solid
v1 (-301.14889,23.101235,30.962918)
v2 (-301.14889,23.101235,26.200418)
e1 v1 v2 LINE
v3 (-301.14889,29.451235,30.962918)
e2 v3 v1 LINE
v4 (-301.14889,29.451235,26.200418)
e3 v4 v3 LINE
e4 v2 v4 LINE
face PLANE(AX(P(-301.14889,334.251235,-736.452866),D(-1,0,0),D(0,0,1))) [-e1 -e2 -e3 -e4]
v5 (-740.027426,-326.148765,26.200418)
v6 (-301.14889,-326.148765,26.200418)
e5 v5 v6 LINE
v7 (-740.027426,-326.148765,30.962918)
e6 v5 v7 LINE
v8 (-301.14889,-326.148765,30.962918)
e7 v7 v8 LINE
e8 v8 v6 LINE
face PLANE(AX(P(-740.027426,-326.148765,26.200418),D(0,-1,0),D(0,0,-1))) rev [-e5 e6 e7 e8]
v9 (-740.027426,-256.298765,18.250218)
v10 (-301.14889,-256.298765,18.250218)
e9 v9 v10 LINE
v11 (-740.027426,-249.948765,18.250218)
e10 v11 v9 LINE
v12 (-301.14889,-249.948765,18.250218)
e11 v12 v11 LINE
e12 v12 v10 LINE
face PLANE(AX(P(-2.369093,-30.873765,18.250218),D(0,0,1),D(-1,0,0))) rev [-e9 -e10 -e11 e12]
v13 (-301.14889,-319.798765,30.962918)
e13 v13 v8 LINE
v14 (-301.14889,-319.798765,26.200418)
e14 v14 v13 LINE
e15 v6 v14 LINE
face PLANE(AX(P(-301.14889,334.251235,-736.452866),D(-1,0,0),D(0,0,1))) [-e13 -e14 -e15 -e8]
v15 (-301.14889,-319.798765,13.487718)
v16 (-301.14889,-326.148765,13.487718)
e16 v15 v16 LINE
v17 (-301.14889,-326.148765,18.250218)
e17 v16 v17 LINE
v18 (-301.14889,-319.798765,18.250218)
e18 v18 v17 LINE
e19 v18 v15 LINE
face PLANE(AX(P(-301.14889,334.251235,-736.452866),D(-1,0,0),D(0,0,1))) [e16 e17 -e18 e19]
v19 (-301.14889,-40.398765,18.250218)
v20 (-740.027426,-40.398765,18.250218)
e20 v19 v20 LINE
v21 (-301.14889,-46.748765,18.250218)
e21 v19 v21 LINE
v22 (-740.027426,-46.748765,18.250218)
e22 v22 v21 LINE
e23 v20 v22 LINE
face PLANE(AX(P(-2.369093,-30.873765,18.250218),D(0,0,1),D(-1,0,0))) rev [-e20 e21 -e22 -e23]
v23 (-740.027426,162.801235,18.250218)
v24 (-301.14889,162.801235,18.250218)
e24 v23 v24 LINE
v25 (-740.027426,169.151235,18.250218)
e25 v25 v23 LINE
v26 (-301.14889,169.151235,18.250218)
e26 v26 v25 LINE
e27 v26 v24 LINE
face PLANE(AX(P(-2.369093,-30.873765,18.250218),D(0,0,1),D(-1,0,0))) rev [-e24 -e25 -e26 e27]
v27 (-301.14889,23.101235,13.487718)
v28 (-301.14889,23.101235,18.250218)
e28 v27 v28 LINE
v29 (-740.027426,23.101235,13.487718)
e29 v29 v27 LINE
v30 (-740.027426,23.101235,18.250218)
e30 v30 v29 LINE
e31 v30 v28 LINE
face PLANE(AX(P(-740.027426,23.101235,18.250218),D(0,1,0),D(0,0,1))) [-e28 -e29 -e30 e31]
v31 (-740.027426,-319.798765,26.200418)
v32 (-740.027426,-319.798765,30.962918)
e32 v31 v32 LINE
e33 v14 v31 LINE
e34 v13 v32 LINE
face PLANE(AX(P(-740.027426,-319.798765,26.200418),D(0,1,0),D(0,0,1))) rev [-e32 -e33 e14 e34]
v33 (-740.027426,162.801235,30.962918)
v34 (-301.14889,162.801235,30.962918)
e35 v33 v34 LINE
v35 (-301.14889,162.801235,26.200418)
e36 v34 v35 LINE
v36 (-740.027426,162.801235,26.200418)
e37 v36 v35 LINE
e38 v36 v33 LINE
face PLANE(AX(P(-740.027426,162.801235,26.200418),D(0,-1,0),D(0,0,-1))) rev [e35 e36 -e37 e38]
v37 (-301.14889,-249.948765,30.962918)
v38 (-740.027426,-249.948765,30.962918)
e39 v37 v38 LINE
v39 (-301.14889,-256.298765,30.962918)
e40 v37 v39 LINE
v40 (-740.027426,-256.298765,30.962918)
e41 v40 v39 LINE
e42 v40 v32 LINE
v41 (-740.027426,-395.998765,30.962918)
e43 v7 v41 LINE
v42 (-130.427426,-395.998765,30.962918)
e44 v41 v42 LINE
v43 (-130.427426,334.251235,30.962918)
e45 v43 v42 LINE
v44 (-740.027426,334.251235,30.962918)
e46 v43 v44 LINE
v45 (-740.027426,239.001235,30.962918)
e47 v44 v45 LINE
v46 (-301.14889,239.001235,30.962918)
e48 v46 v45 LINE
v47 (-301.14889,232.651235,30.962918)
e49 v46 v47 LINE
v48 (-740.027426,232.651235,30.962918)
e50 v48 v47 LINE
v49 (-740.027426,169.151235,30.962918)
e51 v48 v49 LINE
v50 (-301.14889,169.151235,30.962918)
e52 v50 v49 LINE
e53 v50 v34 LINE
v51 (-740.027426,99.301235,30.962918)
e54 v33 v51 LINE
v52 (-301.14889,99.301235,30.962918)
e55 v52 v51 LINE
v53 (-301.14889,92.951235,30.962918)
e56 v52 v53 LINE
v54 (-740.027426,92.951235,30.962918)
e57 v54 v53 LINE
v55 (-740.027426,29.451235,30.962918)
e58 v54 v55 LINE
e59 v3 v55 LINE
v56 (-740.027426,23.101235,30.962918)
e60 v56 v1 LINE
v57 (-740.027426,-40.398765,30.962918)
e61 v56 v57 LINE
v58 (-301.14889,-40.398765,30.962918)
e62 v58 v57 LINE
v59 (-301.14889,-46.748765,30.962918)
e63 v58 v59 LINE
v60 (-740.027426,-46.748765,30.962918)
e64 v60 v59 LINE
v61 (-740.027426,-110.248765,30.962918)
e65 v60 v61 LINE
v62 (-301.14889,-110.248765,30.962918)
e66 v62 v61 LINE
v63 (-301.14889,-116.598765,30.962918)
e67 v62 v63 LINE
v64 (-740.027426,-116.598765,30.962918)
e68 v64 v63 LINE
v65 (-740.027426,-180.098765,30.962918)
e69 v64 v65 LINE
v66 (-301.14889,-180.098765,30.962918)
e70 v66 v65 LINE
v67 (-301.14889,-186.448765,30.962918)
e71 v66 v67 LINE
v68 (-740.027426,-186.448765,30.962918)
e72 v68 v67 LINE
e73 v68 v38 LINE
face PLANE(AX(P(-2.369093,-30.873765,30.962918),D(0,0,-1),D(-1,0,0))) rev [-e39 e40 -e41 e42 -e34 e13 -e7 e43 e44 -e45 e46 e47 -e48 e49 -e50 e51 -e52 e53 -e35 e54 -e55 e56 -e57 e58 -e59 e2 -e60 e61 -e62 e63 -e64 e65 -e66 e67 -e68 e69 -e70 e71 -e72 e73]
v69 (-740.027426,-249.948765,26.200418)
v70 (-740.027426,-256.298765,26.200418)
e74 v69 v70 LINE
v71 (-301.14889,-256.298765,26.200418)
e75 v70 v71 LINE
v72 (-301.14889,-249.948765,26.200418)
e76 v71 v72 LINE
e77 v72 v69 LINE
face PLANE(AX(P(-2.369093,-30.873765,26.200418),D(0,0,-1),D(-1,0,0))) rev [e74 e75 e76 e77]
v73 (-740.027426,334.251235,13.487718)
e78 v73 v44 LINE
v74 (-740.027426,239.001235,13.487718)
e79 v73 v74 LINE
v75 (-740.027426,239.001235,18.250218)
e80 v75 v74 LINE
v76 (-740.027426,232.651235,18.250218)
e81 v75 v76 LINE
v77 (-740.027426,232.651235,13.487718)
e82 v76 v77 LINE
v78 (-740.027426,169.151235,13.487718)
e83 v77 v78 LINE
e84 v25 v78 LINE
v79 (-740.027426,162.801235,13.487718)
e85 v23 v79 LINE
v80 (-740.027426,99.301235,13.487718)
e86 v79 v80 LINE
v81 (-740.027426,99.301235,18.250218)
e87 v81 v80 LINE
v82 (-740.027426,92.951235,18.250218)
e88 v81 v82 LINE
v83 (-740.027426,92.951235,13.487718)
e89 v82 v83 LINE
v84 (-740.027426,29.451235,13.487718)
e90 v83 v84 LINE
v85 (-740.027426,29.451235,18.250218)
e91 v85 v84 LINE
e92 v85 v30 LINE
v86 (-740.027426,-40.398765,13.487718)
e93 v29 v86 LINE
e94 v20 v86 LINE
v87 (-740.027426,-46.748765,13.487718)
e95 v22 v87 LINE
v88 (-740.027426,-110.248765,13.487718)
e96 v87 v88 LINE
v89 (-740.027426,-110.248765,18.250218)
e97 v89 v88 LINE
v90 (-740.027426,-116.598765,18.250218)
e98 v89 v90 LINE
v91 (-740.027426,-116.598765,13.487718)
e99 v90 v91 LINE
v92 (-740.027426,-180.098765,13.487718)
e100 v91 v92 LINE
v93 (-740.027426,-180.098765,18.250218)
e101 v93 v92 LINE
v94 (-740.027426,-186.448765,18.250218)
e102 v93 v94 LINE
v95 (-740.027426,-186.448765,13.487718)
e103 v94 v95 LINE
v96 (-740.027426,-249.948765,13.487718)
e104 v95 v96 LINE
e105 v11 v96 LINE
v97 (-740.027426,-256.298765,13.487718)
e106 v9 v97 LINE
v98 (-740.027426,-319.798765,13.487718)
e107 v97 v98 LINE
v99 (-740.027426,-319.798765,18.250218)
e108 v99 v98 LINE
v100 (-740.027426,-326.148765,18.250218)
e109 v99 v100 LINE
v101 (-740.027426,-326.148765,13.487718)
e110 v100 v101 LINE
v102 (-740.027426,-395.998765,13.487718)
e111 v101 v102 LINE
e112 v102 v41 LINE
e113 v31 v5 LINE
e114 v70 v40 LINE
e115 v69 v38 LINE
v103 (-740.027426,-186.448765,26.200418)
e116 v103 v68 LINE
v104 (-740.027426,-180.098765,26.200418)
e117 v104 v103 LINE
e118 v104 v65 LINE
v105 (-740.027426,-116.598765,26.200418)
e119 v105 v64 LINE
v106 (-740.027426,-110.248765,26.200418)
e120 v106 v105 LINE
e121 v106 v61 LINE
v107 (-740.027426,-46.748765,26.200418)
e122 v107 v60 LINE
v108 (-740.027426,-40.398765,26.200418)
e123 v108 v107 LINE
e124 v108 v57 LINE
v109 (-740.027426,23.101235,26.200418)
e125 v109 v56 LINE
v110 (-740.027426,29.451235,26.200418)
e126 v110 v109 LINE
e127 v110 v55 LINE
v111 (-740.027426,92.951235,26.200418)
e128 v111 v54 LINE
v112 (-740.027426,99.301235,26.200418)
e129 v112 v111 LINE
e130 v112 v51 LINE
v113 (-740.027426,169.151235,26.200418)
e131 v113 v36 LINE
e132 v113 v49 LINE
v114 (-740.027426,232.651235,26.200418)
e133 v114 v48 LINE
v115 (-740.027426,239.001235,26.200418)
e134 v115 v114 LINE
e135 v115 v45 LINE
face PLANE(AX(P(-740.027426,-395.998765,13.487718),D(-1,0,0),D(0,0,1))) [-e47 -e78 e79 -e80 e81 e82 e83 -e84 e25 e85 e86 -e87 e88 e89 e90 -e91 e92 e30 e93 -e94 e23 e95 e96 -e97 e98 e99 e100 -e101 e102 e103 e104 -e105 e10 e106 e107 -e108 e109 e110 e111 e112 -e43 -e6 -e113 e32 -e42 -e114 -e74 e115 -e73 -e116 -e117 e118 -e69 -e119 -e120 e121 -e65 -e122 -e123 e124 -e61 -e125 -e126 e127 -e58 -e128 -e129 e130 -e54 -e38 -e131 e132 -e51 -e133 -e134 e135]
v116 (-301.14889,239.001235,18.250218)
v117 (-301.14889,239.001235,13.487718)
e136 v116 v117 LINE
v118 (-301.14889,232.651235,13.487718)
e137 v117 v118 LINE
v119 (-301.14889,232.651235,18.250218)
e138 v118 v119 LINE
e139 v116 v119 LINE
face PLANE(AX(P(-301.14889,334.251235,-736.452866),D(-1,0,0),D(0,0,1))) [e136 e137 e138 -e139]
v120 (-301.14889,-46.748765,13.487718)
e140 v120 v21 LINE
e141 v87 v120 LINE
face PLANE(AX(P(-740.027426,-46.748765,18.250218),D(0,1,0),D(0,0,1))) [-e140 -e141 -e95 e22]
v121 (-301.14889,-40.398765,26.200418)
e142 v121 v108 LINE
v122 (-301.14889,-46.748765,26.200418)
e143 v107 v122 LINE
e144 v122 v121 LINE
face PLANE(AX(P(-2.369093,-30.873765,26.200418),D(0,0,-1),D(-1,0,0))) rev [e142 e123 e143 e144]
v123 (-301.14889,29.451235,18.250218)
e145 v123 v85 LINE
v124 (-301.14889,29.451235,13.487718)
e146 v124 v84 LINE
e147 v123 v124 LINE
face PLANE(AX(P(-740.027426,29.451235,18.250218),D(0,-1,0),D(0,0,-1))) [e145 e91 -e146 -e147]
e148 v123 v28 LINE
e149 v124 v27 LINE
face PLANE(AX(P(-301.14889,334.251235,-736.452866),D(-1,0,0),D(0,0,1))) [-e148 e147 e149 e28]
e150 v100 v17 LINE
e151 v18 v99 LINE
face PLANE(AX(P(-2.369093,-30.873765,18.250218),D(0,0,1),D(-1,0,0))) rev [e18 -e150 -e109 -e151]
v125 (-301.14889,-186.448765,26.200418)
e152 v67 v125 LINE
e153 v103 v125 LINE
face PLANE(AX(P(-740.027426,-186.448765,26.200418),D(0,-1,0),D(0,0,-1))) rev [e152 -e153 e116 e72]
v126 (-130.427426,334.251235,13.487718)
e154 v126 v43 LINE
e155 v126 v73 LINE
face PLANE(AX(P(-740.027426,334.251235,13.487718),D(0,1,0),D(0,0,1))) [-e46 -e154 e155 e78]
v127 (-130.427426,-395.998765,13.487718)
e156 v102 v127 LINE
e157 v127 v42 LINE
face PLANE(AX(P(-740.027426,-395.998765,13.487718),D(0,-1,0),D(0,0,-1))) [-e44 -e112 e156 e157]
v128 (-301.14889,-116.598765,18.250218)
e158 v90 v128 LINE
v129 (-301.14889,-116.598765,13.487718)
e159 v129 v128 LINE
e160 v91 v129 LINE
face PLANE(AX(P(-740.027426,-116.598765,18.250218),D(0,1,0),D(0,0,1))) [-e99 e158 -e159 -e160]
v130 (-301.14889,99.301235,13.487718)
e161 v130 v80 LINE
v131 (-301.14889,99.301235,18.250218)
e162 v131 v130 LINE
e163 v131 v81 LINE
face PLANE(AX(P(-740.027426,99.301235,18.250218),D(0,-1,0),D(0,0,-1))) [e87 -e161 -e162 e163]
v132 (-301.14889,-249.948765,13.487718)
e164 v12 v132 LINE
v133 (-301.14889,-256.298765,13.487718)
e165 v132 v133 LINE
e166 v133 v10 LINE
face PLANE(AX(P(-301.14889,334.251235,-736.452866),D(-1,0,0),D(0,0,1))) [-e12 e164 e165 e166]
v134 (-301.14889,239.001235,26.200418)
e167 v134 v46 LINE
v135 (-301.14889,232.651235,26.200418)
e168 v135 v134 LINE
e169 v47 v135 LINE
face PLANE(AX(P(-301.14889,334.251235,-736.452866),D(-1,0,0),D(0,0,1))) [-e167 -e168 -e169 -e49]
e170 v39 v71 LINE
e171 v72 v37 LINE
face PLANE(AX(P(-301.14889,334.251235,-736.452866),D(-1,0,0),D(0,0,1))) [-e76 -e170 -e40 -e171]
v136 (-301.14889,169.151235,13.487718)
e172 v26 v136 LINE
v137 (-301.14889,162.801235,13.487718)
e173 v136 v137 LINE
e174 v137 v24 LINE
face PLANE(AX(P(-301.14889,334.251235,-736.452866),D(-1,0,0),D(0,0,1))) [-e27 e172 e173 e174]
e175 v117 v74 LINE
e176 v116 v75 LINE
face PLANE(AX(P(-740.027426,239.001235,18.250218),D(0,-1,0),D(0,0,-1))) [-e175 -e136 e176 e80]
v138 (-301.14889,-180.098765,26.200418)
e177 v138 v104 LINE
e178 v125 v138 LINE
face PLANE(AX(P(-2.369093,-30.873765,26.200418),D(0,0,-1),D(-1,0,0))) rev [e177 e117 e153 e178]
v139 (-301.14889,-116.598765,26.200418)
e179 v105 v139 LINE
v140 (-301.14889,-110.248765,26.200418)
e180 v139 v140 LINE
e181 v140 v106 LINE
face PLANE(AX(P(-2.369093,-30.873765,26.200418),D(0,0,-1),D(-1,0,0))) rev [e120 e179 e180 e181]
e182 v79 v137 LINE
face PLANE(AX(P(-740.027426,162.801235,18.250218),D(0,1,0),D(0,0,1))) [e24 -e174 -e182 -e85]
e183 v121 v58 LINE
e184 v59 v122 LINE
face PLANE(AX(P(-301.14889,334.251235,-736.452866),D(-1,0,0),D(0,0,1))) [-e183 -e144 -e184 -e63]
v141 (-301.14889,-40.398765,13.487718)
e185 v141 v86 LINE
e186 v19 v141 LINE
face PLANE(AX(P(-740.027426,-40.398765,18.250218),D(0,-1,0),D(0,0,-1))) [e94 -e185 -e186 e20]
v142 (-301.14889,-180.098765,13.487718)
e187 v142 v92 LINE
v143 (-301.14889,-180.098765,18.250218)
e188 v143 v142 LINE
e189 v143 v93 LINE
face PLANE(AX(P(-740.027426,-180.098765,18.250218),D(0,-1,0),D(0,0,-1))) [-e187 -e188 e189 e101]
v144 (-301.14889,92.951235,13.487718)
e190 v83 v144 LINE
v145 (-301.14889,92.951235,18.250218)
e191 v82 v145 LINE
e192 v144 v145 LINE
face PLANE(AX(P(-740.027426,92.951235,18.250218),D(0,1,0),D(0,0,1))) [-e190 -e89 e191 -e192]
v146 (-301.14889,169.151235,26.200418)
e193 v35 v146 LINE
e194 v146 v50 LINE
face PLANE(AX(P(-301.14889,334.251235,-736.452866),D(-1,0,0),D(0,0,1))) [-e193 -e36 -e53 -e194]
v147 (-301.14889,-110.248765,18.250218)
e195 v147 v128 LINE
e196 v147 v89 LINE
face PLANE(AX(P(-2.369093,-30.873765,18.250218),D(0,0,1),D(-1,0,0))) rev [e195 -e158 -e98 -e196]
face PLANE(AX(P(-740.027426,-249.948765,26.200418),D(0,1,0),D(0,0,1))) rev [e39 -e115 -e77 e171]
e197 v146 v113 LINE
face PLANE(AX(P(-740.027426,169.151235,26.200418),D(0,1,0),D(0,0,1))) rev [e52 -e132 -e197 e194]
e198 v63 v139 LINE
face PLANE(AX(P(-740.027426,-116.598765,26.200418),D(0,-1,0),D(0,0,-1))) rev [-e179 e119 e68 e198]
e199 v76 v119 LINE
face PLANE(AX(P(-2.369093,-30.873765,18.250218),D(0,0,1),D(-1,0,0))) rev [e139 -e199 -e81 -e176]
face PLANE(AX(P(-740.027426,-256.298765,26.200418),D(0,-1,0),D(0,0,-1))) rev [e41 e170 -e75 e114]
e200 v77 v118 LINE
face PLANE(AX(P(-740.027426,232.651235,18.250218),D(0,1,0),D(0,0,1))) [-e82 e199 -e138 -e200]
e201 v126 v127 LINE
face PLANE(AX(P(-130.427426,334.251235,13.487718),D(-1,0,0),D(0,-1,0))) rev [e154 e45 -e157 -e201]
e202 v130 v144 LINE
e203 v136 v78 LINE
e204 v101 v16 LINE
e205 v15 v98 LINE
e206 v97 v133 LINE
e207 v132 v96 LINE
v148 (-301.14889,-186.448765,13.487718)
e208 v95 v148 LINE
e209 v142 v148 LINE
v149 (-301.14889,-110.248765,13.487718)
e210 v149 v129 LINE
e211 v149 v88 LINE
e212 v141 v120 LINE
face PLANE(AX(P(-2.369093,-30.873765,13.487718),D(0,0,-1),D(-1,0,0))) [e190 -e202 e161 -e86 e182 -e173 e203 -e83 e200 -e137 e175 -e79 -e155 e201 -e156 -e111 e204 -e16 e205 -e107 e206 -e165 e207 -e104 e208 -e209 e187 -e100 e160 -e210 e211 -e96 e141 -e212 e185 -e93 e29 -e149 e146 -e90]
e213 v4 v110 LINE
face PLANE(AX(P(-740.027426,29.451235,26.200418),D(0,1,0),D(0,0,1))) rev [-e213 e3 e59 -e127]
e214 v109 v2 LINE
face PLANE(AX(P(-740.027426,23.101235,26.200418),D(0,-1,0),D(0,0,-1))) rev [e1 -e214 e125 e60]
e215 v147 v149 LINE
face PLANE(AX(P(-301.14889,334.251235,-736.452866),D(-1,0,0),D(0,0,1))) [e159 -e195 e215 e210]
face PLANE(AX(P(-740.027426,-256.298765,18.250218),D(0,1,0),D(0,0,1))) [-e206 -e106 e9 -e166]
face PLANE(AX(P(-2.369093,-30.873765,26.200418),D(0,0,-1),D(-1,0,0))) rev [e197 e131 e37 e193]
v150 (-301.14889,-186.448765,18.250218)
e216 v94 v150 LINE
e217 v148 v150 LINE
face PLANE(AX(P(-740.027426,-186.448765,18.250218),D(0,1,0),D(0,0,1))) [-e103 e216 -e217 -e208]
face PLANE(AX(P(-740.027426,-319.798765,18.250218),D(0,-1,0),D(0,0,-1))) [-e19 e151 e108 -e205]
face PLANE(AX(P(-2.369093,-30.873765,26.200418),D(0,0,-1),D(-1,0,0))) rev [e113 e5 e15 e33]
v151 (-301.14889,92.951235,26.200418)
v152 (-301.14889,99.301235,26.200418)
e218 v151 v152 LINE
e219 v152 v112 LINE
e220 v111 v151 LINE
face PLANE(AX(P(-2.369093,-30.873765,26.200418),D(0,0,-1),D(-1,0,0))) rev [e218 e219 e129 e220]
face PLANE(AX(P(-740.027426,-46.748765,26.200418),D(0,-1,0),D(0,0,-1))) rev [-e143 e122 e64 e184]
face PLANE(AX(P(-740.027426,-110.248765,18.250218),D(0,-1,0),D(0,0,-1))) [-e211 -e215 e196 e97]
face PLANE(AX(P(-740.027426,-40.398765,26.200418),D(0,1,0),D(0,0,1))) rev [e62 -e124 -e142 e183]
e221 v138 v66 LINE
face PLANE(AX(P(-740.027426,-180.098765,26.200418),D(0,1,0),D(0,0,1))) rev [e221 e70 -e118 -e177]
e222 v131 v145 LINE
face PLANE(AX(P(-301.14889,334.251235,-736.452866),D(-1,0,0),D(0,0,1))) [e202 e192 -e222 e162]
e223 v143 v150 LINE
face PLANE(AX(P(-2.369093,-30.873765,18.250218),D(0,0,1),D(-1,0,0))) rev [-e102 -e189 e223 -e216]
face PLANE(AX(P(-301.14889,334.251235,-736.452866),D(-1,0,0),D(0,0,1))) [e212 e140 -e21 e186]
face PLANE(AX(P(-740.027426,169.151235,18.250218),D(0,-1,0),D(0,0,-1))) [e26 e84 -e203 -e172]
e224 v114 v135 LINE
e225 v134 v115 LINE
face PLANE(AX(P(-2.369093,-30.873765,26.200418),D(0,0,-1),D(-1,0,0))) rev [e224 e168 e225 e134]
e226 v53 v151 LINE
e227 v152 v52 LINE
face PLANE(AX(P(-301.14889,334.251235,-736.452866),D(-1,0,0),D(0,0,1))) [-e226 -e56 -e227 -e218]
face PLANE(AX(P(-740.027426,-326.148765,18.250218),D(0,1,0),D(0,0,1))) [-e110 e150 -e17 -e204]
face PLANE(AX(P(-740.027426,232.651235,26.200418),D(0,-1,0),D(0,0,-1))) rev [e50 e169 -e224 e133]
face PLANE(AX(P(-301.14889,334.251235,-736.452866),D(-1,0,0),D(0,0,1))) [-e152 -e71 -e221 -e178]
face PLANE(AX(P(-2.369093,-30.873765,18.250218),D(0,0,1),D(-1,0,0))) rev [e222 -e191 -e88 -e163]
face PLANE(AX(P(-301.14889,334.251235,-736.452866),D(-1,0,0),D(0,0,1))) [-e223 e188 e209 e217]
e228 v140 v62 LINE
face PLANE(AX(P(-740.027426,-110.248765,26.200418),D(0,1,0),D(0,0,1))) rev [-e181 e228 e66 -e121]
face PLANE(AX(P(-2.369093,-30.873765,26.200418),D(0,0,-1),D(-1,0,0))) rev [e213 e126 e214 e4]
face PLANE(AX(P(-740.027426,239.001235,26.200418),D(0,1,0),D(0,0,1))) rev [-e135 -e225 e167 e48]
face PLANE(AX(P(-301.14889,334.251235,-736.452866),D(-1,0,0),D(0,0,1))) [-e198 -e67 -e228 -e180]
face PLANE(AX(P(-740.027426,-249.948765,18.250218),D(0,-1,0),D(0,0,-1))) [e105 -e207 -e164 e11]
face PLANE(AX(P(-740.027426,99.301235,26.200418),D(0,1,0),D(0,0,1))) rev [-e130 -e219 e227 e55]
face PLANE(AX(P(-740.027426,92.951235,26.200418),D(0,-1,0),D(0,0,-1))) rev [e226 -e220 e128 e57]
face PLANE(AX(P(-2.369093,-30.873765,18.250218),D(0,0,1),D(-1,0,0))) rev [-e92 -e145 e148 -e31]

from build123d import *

# Parameters (mm, degrees)
PARTSCAB_REFERENCE_START = -740.027426398
PARTSCAB_REFERENCE_DEPTH = 1475.316666666
SKETCH1_W                = 865.716666666
SKETCH1_H                = 730.25
CUT_EXTRUDE1_DEPTH       = 840.500444405
BOSS_EXTRUDE1_REACH      = 841.5
SKETCH2_W                = 170.721463347
SKETCH2_H                = 730.25


# Read off the part's stored shape, not the designer's step: PartsCab_Reference
with BuildPart() as part:
    # PartsCab_Reference outline → PartsCab_Reference (new body)
    with BuildSketch(Plane.YZ.offset(PARTSCAB_REFERENCE_START)):
        Polygon((-395.998764796, 30.962918268), (-395.998764796, 13.487718268), (-326.148764796, 13.487718268), (-326.148764796, 18.250218268), (-319.798764796, 18.250218268), (-319.798764796, 13.487718268), (-256.298764796, 13.487718268), (-256.298764796, 18.250218268), (-249.948764796, 18.250218268), (-249.948764796, 13.487718268), (-186.448764796, 13.487718268), (-186.448764796, 18.250218268), (-180.098764796, 18.250218268), (-180.098764796, 13.487718268), (-116.598764796, 13.487718268), (-116.598764796, 18.250218268), (-110.248764796, 18.250218268), (-110.248764796, 13.487718268), (-46.748764796, 13.487718268), (-46.748764796, 18.250218268), (-40.398764796, 18.250218268), (-40.398764796, 13.487718268), (23.101235204, 13.487718268), (23.101235204, 18.250218268), (29.451235204, 18.250218268), (29.451235204, 13.487718268), (92.951235204, 13.487718268), (92.951235204, 18.250218268), (99.301235204, 18.250218268), (99.301235204, 13.487718268), (162.801235204, 13.487718268), (162.801235204, 18.250218268), (169.151235204, 18.250218268), (169.151235204, 13.487718268), (232.651235204, 13.487718268), (232.651235204, 18.250218268), (239.001235204, 18.250218268), (239.001235204, 13.487718268), (334.251235204, 13.487718268), (334.251235204, 30.962918268), (239.001235204, 30.962918268), (239.001235204, 26.200418268), (232.651235204, 26.200418268), (232.651235204, 30.962918268), (169.151235204, 30.962918268), (169.151235204, 26.200418268), (162.801235204, 26.200418268), (162.801235204, 30.962918268), (99.301235204, 30.962918268), (99.301235204, 26.200418268), (92.951235204, 26.200418268), (92.951235204, 30.962918268), (29.451235204, 30.962918268), (29.451235204, 26.200418268), (23.101235204, 26.200418268), (23.101235204, 30.962918268), (-40.398764796, 30.962918268), (-40.398764796, 26.200418268), (-46.748764796, 26.200418268), (-46.748764796, 30.962918268), (-110.248764796, 30.962918268), (-110.248764796, 26.200418268), (-116.598764796, 26.200418268), (-116.598764796, 30.962918268), (-180.098764796, 30.962918268), (-180.098764796, 26.200418268), (-186.448764796, 26.200418268), (-186.448764796, 30.962918268), (-249.948764796, 30.962918268), (-249.948764796, 26.200418268), (-256.298764796, 26.200418268), (-256.298764796, 30.962918268), (-319.798764796, 30.962918268), (-319.798764796, 26.200418268), (-326.148764796, 26.200418268), (-326.148764796, 30.962918268), align=None)
    extrude(amount=PARTSCAB_REFERENCE_DEPTH)

    # Sketch1 → Cut-Extrude1 (cut, through all)
    with BuildSketch(Plane.XY.offset(30.962918268)):
        with Locations((302.430906935, -30.873764796)):
            Rectangle(SKETCH1_W, SKETCH1_H)
    extrude(amount=-CUT_EXTRUDE1_DEPTH, mode=Mode.SUBTRACT)

    # Boss-Extrude1: up to this face of the body (flat: up to its plane)
    boss_extrude1_end = Plane(part.part.faces().sort_by_distance((-435.227426398, -361.073764796, 13.487718268))[0])
    # Sketch2 → Boss-Extrude1 (add, up to the picked face)
    with BuildSketch(Plane.XY.offset(30.962918268), mode=Mode.PRIVATE) as boss_extrude1_sk1:
        with Locations((-215.788158071, -30.873764796)):
            Rectangle(SKETCH2_W, SKETCH2_H)
    boss_extrude1_tool1 = split(extrude(boss_extrude1_sk1.sketch, amount=-BOSS_EXTRUDE1_REACH, mode=Mode.PRIVATE), bisect_by=boss_extrude1_end, keep=Keep.BOTH, mode=Mode.PRIVATE)
    add(boss_extrude1_tool1.solids().sort_by(Axis((-215.788158, -30.873765, 30.962918), (0, 0, -1)))[0])


solid = part.part
